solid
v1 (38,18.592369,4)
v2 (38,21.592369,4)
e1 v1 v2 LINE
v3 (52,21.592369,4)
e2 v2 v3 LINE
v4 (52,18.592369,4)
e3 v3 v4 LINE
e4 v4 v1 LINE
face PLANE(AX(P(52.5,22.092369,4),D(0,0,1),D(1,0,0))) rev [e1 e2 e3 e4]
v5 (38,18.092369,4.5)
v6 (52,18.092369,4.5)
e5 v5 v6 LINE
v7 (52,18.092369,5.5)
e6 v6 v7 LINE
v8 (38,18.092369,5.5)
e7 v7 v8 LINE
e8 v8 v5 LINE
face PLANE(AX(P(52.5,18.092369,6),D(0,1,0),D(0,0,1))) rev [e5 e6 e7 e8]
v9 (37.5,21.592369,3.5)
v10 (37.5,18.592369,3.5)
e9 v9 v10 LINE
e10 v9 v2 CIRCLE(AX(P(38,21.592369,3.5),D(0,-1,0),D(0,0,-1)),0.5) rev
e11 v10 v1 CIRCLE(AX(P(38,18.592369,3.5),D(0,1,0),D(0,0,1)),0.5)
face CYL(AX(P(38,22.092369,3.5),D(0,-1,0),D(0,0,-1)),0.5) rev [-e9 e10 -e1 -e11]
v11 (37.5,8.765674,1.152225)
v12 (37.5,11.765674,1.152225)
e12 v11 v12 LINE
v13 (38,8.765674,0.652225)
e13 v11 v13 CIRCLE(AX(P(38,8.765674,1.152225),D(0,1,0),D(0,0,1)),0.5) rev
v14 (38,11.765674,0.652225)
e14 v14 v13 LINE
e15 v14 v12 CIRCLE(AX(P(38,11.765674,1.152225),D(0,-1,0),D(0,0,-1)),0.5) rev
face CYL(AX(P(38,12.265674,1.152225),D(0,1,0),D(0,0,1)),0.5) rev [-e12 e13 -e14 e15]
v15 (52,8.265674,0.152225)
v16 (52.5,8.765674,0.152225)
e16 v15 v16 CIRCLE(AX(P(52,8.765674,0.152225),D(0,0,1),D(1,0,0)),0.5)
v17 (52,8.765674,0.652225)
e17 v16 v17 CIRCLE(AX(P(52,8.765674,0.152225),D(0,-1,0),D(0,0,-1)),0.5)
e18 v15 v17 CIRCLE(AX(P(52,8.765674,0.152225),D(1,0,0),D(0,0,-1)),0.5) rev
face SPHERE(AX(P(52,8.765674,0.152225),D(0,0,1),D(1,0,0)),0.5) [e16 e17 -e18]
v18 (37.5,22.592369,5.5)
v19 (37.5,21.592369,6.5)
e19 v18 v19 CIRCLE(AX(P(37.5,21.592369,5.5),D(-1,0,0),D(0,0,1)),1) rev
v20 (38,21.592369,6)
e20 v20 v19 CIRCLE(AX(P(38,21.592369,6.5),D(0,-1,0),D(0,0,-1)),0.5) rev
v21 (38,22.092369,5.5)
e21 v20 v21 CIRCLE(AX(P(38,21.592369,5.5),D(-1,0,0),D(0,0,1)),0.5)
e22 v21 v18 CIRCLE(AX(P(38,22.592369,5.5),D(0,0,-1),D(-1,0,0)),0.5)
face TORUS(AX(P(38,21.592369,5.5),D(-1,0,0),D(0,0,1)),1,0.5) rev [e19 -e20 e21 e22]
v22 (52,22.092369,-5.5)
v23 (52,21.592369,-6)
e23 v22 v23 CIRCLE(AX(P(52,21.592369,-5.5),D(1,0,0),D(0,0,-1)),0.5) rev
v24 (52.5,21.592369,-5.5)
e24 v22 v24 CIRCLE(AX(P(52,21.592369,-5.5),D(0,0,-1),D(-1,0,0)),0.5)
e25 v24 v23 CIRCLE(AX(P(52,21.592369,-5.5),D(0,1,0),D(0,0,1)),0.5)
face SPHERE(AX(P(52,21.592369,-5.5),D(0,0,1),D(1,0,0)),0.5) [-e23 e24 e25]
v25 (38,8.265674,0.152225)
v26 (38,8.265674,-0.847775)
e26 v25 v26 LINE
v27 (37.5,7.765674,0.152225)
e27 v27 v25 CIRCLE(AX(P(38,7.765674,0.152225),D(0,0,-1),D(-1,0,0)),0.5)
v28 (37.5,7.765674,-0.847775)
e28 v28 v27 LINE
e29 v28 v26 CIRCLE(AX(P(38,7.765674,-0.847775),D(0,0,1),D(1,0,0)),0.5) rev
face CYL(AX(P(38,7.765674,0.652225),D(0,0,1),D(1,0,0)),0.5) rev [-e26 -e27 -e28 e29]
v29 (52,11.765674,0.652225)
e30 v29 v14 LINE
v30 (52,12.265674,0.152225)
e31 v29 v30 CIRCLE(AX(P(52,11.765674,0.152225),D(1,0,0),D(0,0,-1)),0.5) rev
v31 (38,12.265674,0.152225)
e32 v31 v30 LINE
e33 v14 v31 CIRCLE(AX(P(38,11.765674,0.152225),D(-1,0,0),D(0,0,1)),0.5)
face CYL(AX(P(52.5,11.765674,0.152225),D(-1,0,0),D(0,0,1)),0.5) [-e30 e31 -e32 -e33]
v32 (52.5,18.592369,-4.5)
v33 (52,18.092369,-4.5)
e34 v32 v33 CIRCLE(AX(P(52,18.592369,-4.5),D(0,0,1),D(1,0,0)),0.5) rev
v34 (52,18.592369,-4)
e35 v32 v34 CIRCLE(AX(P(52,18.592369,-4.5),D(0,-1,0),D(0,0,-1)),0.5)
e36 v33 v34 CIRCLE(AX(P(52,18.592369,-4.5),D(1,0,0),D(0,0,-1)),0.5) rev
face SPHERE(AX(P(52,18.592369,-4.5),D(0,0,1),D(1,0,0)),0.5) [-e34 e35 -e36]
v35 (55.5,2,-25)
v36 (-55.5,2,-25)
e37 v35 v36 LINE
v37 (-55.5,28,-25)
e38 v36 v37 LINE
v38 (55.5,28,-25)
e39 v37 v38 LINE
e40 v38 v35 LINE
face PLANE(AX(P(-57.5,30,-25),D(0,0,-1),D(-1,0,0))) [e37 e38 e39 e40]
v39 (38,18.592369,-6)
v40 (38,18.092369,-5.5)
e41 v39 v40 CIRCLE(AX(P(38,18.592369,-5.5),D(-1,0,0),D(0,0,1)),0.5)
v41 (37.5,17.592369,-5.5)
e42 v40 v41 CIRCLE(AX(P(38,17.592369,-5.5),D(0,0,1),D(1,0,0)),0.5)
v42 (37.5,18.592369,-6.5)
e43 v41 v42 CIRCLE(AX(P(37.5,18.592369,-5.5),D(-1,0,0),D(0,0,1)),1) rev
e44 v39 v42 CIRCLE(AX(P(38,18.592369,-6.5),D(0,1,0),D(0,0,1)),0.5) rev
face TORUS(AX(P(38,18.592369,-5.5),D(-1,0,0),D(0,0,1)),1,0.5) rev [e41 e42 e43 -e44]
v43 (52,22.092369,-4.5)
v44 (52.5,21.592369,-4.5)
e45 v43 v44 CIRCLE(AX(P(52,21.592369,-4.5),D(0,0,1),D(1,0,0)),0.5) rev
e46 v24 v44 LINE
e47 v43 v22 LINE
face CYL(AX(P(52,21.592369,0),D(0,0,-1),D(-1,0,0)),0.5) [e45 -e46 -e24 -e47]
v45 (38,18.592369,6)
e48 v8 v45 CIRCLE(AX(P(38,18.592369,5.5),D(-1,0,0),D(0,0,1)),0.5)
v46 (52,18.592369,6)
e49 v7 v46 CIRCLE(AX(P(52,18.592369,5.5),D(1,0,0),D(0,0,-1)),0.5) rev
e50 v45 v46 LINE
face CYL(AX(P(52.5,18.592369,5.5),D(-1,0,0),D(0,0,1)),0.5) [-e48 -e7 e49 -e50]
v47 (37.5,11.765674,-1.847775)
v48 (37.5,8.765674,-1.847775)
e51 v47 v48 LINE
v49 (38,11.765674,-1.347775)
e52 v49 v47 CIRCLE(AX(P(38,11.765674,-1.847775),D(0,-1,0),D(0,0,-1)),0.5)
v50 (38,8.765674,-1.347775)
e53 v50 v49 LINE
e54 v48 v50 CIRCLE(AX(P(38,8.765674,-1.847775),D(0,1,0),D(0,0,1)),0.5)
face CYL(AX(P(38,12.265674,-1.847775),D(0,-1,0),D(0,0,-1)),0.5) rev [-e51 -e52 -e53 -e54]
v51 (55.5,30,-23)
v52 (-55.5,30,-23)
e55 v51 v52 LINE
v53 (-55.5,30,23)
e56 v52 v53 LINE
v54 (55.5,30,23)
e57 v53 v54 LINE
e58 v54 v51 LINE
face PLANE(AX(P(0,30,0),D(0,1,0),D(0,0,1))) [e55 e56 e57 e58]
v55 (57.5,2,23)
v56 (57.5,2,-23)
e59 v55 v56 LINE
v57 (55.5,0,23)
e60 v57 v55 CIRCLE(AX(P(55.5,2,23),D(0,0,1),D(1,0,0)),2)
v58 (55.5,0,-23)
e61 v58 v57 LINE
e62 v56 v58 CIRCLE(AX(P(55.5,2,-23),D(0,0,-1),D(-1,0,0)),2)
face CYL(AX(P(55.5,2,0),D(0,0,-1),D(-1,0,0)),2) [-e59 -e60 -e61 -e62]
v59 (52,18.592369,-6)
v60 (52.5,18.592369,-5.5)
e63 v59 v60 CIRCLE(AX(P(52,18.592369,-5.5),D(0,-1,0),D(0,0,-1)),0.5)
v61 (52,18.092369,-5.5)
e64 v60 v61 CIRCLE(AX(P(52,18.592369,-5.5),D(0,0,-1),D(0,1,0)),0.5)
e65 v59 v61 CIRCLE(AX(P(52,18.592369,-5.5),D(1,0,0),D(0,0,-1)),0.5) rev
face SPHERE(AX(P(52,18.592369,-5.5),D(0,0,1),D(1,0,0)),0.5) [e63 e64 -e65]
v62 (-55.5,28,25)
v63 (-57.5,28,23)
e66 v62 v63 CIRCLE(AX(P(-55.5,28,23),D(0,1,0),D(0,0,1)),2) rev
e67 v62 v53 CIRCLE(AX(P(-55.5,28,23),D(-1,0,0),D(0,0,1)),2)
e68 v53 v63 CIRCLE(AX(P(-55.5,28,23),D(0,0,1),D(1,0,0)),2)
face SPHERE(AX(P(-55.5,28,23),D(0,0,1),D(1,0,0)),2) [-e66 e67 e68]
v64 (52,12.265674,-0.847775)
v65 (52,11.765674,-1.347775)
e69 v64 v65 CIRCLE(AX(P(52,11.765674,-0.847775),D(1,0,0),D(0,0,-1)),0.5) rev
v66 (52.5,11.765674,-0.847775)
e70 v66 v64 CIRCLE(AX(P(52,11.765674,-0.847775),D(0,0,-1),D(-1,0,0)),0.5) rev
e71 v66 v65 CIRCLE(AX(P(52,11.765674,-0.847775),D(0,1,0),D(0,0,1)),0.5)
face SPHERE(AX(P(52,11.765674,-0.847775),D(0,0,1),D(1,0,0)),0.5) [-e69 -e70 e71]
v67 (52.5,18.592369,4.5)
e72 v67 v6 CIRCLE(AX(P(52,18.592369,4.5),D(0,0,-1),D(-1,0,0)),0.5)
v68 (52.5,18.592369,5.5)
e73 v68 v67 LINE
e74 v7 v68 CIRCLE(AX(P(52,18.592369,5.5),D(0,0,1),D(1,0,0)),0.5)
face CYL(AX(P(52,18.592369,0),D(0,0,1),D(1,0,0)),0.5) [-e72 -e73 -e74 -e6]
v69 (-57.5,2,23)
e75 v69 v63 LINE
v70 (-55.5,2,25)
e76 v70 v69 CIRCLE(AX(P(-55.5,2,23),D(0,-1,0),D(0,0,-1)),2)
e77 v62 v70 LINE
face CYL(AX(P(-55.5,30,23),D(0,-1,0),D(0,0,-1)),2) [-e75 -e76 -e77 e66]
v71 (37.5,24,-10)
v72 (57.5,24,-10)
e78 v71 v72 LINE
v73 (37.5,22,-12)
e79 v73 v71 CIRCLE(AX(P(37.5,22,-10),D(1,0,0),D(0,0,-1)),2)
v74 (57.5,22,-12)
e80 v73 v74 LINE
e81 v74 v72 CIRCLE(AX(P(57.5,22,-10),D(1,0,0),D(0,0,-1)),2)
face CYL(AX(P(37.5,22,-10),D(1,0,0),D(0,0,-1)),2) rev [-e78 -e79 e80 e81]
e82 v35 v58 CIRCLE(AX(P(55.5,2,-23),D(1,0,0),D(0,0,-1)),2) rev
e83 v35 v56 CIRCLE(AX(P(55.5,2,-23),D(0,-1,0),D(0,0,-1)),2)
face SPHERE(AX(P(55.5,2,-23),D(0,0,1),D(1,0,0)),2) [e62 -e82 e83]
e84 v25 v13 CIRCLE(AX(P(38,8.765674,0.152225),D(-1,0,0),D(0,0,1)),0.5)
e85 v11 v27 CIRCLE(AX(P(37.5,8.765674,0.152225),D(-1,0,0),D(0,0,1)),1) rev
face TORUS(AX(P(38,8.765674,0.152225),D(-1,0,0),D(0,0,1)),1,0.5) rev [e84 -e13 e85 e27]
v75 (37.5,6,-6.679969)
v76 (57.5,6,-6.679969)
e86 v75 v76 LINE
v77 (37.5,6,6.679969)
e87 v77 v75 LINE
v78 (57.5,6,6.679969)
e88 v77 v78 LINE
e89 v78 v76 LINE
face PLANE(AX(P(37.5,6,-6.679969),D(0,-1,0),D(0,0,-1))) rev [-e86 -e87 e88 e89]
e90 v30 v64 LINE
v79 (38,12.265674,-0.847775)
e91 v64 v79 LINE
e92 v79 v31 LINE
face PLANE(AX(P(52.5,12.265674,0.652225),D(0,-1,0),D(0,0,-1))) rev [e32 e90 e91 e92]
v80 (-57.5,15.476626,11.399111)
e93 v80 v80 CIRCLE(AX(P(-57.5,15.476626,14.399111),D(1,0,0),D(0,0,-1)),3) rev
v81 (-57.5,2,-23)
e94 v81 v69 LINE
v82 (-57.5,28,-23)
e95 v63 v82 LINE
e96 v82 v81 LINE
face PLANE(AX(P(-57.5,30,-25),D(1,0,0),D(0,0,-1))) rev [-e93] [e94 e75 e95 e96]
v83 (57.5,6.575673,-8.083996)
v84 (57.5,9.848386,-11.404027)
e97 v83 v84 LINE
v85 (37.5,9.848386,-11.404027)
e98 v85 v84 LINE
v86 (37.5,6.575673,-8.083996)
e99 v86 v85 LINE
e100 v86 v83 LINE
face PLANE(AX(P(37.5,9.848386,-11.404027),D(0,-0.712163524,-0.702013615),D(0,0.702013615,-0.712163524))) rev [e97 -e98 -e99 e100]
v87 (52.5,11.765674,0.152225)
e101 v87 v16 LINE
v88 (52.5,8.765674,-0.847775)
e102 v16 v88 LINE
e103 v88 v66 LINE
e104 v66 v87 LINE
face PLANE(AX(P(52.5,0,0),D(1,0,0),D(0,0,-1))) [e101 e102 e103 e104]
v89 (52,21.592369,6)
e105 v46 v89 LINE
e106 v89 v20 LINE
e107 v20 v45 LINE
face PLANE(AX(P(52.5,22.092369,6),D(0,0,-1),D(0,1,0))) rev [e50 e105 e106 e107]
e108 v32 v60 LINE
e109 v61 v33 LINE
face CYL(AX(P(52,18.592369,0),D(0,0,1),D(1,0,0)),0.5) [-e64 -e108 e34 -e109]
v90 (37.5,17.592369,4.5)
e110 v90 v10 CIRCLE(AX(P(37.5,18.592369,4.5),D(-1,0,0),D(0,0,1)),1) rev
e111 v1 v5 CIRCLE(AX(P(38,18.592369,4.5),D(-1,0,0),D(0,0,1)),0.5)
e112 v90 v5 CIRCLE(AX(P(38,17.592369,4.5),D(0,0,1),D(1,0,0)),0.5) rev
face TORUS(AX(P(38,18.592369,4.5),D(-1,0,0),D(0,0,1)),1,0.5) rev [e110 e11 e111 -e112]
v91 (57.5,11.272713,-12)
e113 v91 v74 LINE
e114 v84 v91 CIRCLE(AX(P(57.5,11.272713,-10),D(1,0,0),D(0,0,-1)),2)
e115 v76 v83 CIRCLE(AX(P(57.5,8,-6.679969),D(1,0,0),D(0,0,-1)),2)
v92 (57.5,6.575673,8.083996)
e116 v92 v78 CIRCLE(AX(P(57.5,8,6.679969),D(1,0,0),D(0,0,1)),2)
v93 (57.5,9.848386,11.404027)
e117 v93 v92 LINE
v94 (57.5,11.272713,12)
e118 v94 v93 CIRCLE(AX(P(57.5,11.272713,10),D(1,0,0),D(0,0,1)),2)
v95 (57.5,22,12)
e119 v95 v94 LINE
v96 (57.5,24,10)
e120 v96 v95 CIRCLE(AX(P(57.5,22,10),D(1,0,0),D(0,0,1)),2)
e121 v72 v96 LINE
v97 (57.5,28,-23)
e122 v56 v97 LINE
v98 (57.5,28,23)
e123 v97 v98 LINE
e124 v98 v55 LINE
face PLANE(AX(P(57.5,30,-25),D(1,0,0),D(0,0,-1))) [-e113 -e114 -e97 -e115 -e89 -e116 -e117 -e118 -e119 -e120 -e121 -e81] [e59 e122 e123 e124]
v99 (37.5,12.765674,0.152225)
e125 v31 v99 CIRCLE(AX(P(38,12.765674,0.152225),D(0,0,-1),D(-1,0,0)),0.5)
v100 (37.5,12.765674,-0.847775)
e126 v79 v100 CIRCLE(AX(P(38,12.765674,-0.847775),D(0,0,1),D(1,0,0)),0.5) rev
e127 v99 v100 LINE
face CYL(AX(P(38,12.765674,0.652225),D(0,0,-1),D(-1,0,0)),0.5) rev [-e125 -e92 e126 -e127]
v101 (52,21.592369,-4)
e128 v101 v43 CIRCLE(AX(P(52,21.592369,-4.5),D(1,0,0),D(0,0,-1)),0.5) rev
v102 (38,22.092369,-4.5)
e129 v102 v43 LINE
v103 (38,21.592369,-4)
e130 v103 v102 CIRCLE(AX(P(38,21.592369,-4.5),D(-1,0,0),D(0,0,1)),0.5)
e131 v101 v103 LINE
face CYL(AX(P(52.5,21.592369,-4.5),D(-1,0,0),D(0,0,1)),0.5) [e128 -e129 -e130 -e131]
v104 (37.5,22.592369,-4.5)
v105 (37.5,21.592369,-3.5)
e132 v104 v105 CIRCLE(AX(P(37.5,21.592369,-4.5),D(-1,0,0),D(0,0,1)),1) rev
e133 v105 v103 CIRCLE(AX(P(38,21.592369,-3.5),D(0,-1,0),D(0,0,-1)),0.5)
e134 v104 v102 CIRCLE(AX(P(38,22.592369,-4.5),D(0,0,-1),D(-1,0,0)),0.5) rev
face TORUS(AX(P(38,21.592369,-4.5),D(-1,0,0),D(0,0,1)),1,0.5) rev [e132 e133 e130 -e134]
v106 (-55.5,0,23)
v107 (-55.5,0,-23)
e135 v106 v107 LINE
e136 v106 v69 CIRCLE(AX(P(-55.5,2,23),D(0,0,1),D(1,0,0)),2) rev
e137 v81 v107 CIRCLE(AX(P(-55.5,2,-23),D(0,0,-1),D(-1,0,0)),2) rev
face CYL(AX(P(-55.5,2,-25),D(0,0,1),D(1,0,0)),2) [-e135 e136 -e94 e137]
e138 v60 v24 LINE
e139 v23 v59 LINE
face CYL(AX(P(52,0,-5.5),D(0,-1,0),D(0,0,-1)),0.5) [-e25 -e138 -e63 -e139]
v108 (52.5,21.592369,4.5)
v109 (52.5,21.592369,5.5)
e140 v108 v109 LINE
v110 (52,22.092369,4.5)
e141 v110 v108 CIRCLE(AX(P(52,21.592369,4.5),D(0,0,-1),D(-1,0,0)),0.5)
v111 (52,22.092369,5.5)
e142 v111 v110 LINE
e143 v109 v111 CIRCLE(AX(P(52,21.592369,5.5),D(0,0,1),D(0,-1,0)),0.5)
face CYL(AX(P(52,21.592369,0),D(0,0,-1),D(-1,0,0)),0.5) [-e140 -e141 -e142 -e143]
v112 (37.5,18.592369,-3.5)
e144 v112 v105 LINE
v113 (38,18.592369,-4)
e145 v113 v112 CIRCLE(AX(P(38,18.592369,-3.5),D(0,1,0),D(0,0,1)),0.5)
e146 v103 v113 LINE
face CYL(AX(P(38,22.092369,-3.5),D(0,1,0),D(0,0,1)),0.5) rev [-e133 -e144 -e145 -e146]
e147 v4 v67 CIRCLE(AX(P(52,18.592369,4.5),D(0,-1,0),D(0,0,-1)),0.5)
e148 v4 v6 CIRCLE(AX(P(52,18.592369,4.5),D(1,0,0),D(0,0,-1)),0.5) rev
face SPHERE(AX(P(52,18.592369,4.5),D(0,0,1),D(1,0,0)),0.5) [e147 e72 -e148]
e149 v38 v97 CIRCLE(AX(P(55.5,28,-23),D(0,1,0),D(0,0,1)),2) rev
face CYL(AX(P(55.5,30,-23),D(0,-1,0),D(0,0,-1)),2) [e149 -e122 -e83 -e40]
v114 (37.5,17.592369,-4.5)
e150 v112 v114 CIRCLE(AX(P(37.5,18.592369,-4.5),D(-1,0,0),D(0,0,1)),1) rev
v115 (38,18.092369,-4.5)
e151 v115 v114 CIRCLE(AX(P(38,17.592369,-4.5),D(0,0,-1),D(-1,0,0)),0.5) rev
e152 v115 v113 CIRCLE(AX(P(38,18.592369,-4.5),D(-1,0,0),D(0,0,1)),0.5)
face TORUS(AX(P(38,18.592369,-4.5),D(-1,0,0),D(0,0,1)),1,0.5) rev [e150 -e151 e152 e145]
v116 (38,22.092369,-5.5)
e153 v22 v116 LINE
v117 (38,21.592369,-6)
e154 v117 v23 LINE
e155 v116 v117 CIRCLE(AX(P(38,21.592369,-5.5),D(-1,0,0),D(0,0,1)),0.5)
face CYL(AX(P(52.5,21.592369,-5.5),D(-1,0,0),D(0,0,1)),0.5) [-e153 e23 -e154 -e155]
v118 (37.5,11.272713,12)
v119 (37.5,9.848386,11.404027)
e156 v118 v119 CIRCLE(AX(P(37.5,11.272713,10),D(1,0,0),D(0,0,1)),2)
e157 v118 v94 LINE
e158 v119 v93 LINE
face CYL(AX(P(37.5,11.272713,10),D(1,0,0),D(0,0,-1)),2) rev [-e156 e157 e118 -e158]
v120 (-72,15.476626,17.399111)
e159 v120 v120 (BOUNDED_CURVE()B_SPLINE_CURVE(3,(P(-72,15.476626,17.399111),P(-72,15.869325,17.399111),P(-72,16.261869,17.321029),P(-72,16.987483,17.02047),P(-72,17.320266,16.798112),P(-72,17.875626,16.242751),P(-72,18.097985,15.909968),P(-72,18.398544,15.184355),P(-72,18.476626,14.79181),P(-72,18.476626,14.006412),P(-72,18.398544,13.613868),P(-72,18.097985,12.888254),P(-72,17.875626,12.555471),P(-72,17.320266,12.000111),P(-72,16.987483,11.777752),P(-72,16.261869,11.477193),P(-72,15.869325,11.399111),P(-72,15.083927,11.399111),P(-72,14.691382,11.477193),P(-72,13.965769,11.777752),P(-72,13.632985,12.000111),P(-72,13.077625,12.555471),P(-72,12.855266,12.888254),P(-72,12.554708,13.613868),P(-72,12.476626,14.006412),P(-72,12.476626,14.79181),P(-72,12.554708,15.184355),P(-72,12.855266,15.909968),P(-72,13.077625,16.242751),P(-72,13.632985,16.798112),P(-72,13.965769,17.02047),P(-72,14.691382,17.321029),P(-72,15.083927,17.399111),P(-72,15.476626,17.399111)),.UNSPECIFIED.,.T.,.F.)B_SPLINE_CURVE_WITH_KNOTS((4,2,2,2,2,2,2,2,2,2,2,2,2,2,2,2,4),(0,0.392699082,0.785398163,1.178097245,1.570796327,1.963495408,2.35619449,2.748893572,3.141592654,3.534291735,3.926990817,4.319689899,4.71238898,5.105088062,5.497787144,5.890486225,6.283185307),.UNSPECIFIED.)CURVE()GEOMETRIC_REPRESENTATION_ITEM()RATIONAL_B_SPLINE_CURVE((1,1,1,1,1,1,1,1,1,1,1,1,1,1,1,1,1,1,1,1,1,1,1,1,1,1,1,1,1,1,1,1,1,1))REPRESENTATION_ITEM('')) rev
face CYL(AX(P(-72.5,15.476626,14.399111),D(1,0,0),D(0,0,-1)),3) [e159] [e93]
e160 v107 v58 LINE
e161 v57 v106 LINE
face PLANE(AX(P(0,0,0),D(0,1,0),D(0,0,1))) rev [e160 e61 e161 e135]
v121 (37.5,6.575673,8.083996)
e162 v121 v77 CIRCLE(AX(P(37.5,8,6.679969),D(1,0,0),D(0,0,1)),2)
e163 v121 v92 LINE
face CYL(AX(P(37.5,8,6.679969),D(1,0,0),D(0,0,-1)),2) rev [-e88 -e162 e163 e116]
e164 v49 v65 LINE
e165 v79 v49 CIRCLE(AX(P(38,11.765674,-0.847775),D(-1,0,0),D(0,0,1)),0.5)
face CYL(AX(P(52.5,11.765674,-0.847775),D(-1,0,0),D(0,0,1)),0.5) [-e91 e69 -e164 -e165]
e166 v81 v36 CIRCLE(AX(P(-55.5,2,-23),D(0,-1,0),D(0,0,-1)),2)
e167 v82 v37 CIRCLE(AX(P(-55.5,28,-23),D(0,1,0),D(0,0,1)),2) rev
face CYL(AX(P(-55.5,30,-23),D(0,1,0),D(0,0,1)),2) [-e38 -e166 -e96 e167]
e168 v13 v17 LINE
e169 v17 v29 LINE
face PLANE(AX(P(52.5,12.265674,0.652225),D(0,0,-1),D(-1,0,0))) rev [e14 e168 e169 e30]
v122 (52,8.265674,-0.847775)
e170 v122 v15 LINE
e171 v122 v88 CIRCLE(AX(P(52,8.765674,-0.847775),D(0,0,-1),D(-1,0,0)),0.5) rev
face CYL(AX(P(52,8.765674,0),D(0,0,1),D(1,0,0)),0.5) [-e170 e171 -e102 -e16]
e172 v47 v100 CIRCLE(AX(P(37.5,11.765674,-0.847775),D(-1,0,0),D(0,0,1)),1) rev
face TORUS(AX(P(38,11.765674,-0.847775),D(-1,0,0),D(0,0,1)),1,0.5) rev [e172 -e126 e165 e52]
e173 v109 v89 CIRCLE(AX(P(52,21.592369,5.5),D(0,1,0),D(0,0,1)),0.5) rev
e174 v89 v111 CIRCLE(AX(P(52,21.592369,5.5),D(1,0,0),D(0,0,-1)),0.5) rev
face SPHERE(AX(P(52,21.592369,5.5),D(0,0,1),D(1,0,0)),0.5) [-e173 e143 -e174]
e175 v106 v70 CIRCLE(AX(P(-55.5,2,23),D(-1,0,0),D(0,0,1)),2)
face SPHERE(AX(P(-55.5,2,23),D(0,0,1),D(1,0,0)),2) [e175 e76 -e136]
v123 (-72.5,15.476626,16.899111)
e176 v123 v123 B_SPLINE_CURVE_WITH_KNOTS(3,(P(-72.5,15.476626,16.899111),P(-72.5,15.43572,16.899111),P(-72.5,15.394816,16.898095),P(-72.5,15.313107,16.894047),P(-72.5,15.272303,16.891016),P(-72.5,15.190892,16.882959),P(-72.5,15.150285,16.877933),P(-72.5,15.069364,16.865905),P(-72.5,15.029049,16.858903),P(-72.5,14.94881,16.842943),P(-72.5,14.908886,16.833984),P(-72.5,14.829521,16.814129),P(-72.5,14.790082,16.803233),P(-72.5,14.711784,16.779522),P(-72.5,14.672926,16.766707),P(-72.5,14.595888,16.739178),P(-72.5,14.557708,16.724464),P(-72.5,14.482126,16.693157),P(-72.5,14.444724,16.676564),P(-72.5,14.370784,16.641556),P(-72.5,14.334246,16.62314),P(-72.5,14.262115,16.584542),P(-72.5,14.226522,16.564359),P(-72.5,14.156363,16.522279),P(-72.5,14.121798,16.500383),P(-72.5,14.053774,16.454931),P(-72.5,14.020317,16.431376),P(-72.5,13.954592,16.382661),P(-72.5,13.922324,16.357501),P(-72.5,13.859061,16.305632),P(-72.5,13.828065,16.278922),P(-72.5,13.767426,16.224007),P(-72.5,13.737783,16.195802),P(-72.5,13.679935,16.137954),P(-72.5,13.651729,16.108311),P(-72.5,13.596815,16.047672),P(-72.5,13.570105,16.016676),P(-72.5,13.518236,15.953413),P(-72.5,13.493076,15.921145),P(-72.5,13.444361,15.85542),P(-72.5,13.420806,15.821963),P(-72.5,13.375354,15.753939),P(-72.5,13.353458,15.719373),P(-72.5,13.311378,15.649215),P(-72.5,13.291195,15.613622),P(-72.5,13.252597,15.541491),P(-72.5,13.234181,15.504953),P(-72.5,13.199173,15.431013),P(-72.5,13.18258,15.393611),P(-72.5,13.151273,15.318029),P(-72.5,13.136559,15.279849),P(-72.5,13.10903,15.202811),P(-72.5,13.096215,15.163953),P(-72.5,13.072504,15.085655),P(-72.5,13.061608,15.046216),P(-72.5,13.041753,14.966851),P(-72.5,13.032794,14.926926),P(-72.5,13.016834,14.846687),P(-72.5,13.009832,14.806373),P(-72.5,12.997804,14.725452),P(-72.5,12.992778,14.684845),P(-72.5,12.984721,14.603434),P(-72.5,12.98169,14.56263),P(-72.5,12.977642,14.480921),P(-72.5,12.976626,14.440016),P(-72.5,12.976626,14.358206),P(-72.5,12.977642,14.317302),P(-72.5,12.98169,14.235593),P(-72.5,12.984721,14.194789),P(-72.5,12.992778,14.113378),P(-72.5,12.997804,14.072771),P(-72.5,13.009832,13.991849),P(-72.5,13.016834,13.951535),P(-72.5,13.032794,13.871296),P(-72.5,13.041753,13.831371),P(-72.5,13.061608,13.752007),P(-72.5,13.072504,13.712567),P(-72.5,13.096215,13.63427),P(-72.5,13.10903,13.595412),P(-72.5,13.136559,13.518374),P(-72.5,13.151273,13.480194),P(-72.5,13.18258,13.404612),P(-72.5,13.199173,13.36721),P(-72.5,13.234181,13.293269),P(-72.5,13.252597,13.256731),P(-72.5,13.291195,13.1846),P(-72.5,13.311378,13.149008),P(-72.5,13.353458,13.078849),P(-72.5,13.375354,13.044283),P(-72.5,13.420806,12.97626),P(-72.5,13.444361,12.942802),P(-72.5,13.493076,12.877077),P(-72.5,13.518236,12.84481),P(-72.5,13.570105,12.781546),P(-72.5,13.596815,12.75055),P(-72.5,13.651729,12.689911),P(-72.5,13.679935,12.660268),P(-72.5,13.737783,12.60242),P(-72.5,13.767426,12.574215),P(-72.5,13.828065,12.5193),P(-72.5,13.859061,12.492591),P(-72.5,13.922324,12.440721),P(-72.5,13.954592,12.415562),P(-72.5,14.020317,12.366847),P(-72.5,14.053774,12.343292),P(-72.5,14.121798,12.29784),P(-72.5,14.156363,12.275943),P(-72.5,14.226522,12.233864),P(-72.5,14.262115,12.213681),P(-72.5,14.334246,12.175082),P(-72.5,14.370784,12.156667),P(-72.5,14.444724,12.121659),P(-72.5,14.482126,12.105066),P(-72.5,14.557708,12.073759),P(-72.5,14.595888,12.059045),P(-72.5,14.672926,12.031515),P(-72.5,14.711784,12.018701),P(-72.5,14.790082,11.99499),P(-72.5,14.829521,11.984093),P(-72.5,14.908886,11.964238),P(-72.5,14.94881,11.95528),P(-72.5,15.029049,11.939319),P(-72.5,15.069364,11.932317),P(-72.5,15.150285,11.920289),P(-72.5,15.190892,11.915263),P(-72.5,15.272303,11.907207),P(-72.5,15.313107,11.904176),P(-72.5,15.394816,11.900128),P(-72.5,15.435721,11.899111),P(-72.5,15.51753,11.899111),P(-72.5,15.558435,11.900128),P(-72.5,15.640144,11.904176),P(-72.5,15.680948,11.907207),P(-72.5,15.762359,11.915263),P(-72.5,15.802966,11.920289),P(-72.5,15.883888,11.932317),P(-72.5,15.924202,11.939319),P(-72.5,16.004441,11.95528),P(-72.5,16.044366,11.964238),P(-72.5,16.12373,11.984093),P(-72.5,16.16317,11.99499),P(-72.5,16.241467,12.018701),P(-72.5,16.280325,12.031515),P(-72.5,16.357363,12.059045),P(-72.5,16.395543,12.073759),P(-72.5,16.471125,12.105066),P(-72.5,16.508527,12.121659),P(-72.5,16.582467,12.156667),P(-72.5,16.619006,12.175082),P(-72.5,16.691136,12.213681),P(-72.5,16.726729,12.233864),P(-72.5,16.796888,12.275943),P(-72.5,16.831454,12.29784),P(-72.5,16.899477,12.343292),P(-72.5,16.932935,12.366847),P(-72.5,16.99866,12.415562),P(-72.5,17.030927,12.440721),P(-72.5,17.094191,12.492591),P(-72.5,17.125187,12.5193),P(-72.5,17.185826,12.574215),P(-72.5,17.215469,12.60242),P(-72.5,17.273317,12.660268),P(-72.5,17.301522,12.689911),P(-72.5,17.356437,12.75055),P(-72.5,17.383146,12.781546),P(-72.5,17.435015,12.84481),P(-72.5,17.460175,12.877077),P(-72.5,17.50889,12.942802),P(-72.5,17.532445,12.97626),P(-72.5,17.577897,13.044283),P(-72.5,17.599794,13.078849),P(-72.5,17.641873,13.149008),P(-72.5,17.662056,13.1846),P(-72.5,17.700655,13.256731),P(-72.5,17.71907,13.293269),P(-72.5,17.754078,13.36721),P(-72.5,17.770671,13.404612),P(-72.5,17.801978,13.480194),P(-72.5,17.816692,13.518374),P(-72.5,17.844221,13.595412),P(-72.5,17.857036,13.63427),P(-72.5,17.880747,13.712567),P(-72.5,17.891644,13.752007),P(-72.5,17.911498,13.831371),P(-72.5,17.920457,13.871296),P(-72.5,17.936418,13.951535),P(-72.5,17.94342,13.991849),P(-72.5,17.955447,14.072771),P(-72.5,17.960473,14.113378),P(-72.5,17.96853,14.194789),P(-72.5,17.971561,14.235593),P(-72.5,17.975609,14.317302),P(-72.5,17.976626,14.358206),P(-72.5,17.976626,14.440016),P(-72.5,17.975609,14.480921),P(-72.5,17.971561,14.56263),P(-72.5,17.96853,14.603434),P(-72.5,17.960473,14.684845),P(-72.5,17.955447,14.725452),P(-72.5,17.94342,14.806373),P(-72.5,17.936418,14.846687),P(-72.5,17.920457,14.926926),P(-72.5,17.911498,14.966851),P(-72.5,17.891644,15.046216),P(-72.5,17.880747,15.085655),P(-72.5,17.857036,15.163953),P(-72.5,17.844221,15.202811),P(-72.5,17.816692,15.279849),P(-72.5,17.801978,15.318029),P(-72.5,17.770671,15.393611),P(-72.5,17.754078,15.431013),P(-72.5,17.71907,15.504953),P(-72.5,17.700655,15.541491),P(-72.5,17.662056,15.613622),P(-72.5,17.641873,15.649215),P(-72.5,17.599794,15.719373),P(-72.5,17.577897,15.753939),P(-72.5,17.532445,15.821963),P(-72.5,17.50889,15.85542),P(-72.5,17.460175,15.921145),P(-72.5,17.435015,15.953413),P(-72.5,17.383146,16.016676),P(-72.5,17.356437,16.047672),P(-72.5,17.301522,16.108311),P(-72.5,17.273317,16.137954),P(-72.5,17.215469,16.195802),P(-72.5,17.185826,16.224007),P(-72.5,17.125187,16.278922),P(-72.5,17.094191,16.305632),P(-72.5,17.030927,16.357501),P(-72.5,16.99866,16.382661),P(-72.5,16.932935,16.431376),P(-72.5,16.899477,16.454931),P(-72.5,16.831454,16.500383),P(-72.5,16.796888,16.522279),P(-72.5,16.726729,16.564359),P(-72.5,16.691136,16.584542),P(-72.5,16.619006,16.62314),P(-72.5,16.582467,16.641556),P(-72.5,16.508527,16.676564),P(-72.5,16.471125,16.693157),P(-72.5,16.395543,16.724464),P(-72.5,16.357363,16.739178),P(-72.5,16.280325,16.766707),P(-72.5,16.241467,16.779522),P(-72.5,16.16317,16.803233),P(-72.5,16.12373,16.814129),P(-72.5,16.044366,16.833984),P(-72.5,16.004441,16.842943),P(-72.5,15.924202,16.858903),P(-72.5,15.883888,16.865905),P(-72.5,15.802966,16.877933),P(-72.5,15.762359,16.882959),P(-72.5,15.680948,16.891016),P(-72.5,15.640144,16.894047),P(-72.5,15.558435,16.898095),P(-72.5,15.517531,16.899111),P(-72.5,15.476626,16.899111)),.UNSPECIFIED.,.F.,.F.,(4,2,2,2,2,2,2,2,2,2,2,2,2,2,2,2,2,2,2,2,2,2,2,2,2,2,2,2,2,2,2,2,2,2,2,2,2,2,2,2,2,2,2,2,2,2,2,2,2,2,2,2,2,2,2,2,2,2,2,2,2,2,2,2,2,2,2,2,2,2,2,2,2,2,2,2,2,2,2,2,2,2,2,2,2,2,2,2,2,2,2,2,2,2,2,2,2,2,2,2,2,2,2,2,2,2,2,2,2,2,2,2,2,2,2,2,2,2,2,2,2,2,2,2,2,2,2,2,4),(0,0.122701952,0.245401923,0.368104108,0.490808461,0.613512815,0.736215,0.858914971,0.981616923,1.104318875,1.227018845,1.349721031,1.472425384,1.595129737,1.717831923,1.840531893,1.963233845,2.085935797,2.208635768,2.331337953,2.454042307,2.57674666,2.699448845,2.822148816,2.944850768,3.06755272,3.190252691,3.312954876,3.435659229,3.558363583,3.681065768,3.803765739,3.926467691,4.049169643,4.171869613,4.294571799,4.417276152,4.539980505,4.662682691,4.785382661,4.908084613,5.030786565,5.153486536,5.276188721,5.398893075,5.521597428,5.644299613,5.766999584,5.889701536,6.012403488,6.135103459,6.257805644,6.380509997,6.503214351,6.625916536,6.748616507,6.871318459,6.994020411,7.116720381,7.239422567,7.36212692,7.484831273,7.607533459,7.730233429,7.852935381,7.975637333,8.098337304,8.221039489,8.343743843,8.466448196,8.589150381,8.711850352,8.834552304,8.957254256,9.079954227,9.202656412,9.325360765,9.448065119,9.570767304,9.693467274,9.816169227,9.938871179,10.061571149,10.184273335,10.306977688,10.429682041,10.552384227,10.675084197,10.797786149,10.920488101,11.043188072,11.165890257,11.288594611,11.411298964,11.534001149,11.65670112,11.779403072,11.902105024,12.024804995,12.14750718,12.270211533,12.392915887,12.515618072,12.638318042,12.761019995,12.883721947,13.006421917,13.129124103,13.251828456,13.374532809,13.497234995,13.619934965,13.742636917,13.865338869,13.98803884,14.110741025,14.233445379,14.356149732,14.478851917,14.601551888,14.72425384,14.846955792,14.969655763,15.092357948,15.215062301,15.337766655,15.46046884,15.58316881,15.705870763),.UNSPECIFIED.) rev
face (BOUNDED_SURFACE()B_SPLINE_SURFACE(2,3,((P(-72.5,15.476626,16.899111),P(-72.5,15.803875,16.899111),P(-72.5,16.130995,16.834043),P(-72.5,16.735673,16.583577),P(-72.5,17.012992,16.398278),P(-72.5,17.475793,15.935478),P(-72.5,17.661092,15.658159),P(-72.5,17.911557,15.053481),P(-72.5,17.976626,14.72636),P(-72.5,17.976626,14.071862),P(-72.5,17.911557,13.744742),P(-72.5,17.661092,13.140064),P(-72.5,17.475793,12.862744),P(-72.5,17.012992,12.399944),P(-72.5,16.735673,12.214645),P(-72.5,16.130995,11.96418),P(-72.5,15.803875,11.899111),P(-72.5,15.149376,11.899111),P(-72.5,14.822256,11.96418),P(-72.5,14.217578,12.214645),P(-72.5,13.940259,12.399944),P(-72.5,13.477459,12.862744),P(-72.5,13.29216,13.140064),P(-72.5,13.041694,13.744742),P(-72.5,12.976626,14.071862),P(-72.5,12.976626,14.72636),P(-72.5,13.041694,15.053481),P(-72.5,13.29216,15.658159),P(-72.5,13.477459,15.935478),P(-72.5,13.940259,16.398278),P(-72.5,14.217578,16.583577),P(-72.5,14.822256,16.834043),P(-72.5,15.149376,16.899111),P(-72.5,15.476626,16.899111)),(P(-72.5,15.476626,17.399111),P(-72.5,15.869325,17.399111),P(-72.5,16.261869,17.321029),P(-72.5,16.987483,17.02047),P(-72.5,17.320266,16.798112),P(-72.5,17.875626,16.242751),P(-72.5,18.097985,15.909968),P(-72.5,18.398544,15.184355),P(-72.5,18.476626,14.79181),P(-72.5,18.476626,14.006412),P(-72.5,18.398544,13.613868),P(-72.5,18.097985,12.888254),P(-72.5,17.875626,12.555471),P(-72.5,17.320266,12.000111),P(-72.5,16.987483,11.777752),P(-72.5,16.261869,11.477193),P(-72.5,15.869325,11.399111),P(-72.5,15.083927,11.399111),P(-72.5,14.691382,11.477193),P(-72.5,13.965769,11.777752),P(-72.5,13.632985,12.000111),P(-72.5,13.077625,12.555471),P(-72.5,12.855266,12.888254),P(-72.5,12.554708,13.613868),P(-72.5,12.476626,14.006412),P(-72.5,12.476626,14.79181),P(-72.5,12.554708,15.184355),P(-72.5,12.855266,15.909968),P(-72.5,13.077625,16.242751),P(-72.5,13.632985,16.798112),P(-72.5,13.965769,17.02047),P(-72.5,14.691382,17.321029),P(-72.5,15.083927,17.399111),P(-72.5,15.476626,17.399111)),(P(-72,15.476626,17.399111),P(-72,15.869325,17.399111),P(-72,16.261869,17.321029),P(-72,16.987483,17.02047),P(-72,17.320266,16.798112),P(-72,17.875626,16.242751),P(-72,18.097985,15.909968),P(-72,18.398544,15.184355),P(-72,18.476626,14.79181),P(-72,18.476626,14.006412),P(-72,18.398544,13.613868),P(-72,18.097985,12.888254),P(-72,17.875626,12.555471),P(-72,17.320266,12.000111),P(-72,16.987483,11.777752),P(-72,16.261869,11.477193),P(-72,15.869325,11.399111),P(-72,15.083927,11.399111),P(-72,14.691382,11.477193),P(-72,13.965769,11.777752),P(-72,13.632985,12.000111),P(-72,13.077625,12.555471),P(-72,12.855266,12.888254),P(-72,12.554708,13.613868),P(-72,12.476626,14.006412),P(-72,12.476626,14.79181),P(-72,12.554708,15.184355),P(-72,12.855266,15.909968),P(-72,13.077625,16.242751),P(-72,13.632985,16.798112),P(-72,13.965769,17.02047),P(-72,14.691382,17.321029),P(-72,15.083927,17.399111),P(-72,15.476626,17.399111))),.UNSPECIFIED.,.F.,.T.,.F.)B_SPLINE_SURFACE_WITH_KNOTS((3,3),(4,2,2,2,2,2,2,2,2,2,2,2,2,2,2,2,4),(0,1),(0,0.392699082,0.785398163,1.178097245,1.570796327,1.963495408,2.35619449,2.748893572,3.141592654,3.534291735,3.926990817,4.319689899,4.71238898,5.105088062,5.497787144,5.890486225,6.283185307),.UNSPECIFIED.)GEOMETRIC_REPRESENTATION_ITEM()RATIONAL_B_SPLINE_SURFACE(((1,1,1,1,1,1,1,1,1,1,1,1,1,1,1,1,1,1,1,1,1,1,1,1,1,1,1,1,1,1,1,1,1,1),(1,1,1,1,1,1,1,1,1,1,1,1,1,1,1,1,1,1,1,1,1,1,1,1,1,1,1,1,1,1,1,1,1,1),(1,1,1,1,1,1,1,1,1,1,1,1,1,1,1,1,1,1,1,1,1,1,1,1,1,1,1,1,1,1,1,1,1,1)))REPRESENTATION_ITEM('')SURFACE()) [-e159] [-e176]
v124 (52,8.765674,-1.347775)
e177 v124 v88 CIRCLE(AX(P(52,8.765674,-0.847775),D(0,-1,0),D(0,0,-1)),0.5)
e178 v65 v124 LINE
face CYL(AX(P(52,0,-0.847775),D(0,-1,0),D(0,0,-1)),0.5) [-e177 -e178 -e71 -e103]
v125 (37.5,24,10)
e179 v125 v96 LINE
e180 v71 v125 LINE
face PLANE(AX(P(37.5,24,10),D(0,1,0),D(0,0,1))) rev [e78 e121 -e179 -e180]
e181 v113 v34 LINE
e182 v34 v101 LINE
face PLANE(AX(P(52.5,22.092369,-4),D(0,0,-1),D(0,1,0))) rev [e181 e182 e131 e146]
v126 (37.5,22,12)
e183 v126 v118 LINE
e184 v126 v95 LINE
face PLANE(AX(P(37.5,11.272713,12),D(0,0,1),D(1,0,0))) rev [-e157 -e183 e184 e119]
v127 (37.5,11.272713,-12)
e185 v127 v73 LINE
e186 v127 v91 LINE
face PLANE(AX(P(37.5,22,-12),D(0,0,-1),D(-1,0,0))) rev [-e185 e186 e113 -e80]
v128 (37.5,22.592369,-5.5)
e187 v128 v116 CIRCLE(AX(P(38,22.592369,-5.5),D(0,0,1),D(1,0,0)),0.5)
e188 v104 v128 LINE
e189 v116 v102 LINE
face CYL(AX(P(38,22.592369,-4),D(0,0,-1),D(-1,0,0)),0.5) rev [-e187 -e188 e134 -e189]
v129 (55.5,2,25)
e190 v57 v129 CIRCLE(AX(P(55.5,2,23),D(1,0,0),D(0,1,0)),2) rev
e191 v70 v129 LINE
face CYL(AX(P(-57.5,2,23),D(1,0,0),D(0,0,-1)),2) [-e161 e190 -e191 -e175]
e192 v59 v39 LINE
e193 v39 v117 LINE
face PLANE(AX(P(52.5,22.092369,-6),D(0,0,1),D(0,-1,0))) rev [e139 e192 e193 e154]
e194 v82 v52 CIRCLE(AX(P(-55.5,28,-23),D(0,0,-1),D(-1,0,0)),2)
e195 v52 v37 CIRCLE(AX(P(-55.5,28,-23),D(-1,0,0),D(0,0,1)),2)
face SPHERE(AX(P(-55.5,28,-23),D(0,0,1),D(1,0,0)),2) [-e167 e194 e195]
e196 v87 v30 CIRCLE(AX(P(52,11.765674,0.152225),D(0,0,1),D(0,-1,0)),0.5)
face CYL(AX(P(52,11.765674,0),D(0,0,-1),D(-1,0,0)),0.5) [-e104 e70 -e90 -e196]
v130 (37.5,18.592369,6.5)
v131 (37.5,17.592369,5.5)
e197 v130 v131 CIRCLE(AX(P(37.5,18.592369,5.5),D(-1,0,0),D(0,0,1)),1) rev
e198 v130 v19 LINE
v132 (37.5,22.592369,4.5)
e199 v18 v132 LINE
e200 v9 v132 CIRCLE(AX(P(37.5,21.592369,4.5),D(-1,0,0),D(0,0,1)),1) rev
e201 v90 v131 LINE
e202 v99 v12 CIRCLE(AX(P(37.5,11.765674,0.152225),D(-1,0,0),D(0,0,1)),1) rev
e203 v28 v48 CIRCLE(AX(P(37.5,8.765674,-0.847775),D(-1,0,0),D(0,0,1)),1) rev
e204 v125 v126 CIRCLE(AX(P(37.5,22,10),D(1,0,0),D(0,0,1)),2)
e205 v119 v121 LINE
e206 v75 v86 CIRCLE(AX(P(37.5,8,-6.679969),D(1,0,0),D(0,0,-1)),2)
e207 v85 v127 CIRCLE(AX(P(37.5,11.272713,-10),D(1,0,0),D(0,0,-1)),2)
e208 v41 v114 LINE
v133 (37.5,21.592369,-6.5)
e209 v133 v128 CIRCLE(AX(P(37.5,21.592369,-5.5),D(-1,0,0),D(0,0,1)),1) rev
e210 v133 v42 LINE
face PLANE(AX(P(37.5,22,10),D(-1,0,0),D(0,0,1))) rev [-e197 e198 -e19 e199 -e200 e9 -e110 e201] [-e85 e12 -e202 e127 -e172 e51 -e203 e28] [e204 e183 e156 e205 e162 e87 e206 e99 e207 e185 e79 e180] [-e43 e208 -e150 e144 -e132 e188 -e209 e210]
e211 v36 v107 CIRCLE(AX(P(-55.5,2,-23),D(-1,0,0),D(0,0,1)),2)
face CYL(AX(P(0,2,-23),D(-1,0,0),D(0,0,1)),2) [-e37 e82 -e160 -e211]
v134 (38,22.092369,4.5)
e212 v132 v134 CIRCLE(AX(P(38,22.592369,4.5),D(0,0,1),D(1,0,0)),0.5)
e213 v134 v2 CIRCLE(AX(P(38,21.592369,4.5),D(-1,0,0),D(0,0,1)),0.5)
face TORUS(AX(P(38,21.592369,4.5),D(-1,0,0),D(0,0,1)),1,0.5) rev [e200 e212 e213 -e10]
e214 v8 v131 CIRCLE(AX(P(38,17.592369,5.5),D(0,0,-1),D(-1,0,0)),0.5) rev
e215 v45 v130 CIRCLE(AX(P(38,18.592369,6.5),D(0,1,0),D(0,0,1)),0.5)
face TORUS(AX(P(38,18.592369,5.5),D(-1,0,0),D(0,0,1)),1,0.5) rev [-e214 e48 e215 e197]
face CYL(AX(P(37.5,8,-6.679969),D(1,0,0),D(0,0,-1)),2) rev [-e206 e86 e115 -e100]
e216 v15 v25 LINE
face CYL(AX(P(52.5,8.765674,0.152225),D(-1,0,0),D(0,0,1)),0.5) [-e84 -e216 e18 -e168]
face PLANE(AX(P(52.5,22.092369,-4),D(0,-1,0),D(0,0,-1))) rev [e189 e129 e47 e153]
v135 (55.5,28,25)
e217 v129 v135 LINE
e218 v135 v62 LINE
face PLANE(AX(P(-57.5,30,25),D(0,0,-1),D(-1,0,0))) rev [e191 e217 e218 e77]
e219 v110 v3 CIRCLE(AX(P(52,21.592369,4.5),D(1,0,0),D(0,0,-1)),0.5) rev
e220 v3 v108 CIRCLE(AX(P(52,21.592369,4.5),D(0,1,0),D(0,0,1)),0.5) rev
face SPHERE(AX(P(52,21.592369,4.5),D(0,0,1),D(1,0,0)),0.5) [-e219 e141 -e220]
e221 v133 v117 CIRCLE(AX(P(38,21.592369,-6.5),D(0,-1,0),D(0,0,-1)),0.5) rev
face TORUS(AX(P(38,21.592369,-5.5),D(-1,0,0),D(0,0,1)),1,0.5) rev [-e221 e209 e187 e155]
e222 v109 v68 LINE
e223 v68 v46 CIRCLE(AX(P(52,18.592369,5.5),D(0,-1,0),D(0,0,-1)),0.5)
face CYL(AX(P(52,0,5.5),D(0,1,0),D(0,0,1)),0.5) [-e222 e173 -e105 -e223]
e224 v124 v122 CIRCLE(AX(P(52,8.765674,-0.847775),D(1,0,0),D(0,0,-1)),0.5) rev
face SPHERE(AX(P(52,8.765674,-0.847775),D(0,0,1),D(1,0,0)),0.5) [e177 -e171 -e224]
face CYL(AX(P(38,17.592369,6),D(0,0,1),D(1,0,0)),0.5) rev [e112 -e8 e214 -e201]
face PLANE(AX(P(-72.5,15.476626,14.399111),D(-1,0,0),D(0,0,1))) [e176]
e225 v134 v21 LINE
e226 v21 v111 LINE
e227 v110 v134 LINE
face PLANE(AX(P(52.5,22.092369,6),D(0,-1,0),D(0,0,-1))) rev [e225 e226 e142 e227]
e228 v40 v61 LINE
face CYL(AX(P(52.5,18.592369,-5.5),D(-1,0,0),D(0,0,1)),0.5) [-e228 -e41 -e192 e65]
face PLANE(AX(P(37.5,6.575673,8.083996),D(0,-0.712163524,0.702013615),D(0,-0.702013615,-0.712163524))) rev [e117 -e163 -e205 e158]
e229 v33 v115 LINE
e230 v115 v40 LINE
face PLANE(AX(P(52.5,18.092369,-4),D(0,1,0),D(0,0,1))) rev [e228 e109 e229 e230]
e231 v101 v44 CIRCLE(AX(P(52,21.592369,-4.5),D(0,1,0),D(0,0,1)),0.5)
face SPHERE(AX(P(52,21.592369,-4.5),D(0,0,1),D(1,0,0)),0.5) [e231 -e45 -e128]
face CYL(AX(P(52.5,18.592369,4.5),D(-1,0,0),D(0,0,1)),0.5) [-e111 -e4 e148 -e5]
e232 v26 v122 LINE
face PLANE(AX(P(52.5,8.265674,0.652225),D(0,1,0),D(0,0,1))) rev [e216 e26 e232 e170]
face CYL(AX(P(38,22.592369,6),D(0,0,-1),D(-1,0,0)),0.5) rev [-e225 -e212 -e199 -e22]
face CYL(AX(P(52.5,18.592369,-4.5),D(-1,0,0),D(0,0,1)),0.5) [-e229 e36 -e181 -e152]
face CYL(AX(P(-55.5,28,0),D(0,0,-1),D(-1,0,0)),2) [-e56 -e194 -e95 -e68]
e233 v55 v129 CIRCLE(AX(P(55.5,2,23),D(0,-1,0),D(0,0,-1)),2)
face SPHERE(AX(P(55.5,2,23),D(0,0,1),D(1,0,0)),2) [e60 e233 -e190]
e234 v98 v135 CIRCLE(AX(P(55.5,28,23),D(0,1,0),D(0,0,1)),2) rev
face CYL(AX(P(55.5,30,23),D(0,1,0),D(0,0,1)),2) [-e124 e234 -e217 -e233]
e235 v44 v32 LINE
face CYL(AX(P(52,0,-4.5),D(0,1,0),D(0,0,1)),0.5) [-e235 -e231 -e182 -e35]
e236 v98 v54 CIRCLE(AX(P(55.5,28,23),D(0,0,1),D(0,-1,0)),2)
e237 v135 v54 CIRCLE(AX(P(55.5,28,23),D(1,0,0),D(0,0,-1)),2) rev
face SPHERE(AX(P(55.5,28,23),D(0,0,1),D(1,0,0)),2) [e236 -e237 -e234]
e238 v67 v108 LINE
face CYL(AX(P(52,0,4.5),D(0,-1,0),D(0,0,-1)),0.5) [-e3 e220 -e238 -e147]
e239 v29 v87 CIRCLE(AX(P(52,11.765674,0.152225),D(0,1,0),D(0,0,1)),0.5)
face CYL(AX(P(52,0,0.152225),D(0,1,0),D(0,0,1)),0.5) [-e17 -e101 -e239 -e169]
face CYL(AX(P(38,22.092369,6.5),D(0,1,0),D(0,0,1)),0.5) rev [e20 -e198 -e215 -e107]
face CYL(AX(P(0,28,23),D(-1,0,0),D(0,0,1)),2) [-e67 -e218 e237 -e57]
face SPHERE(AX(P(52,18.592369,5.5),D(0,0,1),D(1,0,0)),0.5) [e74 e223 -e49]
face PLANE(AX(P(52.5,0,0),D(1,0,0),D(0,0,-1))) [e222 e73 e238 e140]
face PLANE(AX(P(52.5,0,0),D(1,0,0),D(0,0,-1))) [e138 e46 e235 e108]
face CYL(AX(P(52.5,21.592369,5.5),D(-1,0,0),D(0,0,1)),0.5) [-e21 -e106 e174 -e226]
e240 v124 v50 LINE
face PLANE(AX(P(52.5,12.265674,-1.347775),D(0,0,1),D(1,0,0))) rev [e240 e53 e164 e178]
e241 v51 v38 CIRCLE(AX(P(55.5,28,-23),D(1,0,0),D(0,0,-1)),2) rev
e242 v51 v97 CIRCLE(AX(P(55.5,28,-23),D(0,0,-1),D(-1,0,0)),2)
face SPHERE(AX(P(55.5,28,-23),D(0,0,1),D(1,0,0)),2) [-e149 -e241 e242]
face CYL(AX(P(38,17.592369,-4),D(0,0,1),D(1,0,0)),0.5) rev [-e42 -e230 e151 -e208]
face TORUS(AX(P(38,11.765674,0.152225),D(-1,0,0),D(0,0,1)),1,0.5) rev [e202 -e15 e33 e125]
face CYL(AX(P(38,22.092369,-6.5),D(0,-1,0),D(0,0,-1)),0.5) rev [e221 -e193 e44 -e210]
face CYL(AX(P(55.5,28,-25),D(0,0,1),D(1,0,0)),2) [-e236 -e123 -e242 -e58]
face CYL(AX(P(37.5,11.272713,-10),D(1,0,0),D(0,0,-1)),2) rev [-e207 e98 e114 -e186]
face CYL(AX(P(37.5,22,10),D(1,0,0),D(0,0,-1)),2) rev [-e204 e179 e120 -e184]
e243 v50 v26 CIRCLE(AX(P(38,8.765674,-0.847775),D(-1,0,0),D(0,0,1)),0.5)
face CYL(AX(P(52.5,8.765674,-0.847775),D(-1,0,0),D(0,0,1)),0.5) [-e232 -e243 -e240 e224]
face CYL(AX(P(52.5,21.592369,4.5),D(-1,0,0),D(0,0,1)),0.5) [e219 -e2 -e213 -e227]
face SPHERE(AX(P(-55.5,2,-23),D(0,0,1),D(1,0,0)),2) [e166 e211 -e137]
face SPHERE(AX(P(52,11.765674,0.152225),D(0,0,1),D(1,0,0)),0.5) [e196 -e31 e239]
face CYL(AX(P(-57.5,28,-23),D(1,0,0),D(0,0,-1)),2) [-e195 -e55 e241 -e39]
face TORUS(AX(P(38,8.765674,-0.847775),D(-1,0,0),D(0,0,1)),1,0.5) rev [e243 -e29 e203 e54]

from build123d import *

# Parameters (mm, degrees)
SKETCH1_W           = 115
SKETCH1_H           = 50
BOSS_EXTRUDE1_DEPTH = 30
FILLET1_R           = 2
CUT_EXTRUDE1_DEPTH  = 20
SKETCH3_W           = 2
SKETCH3_H           = 4
BOSS_EXTRUDE2_DEPTH = 15
FILLET2_R           = 0.5
SKETCH6_R           = 3
BOSS_EXTRUDE3_DEPTH = 15
FILLET4_SIZE        = 0.5


with BuildPart() as part:
    # Sketch1 → Boss-Extrude1 (new body)
    with BuildSketch(Plane(origin=(0, 0, 0), x_dir=(1, 0, 0), z_dir=(0, 1, 0))):
        Rectangle(SKETCH1_W, SKETCH1_H)
    extrude(amount=BOSS_EXTRUDE1_DEPTH)

    # Fillet1
    fillet1_edges = [part.edges().sort_by_distance(p)[0] for p in [
        (57.5, 30, 0),
        (0, 30, -25),
        (-57.5, 30, 0),
        (0, 0, -25),
        (57.5, 0, 0),
        (0, 0, 25),
        (-57.5, 0, 0),
        (0, 30, 25),
        (-57.5, 15, -25),
        (57.5, 15, -25),
        (57.5, 15, 25),
        (-57.5, 15, 25),
    ]]
    fillet(fillet1_edges, radius=FILLET1_R)

    # Sketch2 → Cut-Extrude1 (cut)
    with BuildSketch(Plane(origin=(57.5, 0, 0), x_dir=(0, 0, -1), z_dir=(1, 0, 0))):
        with BuildLine():
            Line((-10, 24), (10, 24))
            ThreePointArc((10, 24), (11.414213562, 23.414213562), (12, 22))
            Line((12, 22), (12, 11.272713236))
            ThreePointArc((12, 11.272713236), (11.845000604, 10.500720509), (11.40402723, 9.848386189))
            Line((11.40402723, 9.848386189), (8.083996193, 6.575672953))
            ThreePointArc((8.083996193, 6.575672953), (7.438700109, 6.149506269), (6.679968963, 6))
            Line((6.679968963, 6), (-6.679968963, 6))
            ThreePointArc((-6.679968963, 6), (-7.438700109, 6.149506269), (-8.083996193, 6.575672953))
            Line((-8.083996193, 6.575672953), (-11.40402723, 9.848386189))
            ThreePointArc((-11.40402723, 9.848386189), (-11.845000604, 10.500720509), (-12, 11.272713236))
            Line((-12, 11.272713236), (-12, 22))
            ThreePointArc((-12, 22), (-11.414213562, 23.414213562), (-10, 24))
        make_face()
    extrude(amount=-CUT_EXTRUDE1_DEPTH, mode=Mode.SUBTRACT)

    # Sketch3 → Boss-Extrude2 (add)
    with BuildSketch(Plane(origin=(37.5, 0, 0), x_dir=(0, 0, -1), z_dir=(1, 0, 0))):
        with Locations((-5, 20.092368614)):
            Rectangle(SKETCH3_W, SKETCH3_H)
        with Locations((0.347775448, 10.265673995)):
            Rectangle(SKETCH3_W, SKETCH3_H)
        with Locations((5, 20.092368614)):
            Rectangle(SKETCH3_W, SKETCH3_H)
    extrude(amount=BOSS_EXTRUDE2_DEPTH)

    # Fillet2
    fillet2_edges = [part.edges().sort_by_distance(p)[0] for p in [
        (37.5, 10.265673995, -1.347775448),
        (45, 8.265673995, -1.347775448),
        (37.5, 12.265673995, -0.347775448),
        (45, 12.265673995, -1.347775448),
        (37.5, 10.265673995, 0.652224552),
        (45, 12.265673995, 0.652224552),
        (37.5, 8.265673995, -0.347775448),
        (45, 8.265673995, 0.652224552),
        (52.5, 10.265673995, -1.347775448),
        (52.5, 12.265673995, -0.347775448),
        (52.5, 10.265673995, 0.652224552),
        (52.5, 8.265673995, -0.347775448),
        (37.5, 20.092368614, -6),
        (45, 18.092368614, -6),
        (37.5, 22.092368614, -5),
        (45, 22.092368614, -6),
        (37.5, 20.092368614, -4),
        (45, 22.092368614, -4),
        (37.5, 18.092368614, -5),
        (45, 18.092368614, -4),
        (52.5, 20.092368614, -6),
        (52.5, 22.092368614, -5),
        (52.5, 20.092368614, -4),
        (52.5, 18.092368614, -5),
        (37.5, 20.092368614, 4),
        (45, 18.092368614, 4),
        (37.5, 22.092368614, 5),
        (45, 22.092368614, 4),
        (37.5, 20.092368614, 6),
        (45, 22.092368614, 6),
        (37.5, 18.092368614, 5),
        (45, 18.092368614, 6),
        (52.5, 20.092368614, 4),
        (52.5, 22.092368614, 5),
        (52.5, 20.092368614, 6),
        (52.5, 18.092368614, 5),
    ]]
    fillet(fillet2_edges, radius=FILLET2_R)

    # Sketch6 → Boss-Extrude3 (add)
    with BuildSketch(Plane.ZY.offset(57.5)):
        with Locations(Location((14.399111254, 15.476625634, 0), (0, 0, 180))):
            Circle(SKETCH6_R)
    extrude(amount=BOSS_EXTRUDE3_DEPTH)

    # Fillet4
    # a fillet whose section is not a circle: 0.5 mm, written as the material it takes off along each edge
    with BuildSketch(Plane(origin=(-72.5, 15.476625634, 14.399111254), x_dir=(0, 0, -1), z_dir=(0, 1, 0))) as fillet4_piece_1:
        with BuildLine():
            Bezier((3, -FILLET4_SIZE), (3, 0), (3 - FILLET4_SIZE, 0), weights=[1, 1, 1])
            Line((3 - FILLET4_SIZE, 0), (3, 0))
            Line((3, 0), (3, -FILLET4_SIZE))
        make_face()
    revolve(axis=Axis((-72.5, 15.476625634, 14.399111254), (-1, 0, 0)), mode=Mode.SUBTRACT)


solid = part.part
